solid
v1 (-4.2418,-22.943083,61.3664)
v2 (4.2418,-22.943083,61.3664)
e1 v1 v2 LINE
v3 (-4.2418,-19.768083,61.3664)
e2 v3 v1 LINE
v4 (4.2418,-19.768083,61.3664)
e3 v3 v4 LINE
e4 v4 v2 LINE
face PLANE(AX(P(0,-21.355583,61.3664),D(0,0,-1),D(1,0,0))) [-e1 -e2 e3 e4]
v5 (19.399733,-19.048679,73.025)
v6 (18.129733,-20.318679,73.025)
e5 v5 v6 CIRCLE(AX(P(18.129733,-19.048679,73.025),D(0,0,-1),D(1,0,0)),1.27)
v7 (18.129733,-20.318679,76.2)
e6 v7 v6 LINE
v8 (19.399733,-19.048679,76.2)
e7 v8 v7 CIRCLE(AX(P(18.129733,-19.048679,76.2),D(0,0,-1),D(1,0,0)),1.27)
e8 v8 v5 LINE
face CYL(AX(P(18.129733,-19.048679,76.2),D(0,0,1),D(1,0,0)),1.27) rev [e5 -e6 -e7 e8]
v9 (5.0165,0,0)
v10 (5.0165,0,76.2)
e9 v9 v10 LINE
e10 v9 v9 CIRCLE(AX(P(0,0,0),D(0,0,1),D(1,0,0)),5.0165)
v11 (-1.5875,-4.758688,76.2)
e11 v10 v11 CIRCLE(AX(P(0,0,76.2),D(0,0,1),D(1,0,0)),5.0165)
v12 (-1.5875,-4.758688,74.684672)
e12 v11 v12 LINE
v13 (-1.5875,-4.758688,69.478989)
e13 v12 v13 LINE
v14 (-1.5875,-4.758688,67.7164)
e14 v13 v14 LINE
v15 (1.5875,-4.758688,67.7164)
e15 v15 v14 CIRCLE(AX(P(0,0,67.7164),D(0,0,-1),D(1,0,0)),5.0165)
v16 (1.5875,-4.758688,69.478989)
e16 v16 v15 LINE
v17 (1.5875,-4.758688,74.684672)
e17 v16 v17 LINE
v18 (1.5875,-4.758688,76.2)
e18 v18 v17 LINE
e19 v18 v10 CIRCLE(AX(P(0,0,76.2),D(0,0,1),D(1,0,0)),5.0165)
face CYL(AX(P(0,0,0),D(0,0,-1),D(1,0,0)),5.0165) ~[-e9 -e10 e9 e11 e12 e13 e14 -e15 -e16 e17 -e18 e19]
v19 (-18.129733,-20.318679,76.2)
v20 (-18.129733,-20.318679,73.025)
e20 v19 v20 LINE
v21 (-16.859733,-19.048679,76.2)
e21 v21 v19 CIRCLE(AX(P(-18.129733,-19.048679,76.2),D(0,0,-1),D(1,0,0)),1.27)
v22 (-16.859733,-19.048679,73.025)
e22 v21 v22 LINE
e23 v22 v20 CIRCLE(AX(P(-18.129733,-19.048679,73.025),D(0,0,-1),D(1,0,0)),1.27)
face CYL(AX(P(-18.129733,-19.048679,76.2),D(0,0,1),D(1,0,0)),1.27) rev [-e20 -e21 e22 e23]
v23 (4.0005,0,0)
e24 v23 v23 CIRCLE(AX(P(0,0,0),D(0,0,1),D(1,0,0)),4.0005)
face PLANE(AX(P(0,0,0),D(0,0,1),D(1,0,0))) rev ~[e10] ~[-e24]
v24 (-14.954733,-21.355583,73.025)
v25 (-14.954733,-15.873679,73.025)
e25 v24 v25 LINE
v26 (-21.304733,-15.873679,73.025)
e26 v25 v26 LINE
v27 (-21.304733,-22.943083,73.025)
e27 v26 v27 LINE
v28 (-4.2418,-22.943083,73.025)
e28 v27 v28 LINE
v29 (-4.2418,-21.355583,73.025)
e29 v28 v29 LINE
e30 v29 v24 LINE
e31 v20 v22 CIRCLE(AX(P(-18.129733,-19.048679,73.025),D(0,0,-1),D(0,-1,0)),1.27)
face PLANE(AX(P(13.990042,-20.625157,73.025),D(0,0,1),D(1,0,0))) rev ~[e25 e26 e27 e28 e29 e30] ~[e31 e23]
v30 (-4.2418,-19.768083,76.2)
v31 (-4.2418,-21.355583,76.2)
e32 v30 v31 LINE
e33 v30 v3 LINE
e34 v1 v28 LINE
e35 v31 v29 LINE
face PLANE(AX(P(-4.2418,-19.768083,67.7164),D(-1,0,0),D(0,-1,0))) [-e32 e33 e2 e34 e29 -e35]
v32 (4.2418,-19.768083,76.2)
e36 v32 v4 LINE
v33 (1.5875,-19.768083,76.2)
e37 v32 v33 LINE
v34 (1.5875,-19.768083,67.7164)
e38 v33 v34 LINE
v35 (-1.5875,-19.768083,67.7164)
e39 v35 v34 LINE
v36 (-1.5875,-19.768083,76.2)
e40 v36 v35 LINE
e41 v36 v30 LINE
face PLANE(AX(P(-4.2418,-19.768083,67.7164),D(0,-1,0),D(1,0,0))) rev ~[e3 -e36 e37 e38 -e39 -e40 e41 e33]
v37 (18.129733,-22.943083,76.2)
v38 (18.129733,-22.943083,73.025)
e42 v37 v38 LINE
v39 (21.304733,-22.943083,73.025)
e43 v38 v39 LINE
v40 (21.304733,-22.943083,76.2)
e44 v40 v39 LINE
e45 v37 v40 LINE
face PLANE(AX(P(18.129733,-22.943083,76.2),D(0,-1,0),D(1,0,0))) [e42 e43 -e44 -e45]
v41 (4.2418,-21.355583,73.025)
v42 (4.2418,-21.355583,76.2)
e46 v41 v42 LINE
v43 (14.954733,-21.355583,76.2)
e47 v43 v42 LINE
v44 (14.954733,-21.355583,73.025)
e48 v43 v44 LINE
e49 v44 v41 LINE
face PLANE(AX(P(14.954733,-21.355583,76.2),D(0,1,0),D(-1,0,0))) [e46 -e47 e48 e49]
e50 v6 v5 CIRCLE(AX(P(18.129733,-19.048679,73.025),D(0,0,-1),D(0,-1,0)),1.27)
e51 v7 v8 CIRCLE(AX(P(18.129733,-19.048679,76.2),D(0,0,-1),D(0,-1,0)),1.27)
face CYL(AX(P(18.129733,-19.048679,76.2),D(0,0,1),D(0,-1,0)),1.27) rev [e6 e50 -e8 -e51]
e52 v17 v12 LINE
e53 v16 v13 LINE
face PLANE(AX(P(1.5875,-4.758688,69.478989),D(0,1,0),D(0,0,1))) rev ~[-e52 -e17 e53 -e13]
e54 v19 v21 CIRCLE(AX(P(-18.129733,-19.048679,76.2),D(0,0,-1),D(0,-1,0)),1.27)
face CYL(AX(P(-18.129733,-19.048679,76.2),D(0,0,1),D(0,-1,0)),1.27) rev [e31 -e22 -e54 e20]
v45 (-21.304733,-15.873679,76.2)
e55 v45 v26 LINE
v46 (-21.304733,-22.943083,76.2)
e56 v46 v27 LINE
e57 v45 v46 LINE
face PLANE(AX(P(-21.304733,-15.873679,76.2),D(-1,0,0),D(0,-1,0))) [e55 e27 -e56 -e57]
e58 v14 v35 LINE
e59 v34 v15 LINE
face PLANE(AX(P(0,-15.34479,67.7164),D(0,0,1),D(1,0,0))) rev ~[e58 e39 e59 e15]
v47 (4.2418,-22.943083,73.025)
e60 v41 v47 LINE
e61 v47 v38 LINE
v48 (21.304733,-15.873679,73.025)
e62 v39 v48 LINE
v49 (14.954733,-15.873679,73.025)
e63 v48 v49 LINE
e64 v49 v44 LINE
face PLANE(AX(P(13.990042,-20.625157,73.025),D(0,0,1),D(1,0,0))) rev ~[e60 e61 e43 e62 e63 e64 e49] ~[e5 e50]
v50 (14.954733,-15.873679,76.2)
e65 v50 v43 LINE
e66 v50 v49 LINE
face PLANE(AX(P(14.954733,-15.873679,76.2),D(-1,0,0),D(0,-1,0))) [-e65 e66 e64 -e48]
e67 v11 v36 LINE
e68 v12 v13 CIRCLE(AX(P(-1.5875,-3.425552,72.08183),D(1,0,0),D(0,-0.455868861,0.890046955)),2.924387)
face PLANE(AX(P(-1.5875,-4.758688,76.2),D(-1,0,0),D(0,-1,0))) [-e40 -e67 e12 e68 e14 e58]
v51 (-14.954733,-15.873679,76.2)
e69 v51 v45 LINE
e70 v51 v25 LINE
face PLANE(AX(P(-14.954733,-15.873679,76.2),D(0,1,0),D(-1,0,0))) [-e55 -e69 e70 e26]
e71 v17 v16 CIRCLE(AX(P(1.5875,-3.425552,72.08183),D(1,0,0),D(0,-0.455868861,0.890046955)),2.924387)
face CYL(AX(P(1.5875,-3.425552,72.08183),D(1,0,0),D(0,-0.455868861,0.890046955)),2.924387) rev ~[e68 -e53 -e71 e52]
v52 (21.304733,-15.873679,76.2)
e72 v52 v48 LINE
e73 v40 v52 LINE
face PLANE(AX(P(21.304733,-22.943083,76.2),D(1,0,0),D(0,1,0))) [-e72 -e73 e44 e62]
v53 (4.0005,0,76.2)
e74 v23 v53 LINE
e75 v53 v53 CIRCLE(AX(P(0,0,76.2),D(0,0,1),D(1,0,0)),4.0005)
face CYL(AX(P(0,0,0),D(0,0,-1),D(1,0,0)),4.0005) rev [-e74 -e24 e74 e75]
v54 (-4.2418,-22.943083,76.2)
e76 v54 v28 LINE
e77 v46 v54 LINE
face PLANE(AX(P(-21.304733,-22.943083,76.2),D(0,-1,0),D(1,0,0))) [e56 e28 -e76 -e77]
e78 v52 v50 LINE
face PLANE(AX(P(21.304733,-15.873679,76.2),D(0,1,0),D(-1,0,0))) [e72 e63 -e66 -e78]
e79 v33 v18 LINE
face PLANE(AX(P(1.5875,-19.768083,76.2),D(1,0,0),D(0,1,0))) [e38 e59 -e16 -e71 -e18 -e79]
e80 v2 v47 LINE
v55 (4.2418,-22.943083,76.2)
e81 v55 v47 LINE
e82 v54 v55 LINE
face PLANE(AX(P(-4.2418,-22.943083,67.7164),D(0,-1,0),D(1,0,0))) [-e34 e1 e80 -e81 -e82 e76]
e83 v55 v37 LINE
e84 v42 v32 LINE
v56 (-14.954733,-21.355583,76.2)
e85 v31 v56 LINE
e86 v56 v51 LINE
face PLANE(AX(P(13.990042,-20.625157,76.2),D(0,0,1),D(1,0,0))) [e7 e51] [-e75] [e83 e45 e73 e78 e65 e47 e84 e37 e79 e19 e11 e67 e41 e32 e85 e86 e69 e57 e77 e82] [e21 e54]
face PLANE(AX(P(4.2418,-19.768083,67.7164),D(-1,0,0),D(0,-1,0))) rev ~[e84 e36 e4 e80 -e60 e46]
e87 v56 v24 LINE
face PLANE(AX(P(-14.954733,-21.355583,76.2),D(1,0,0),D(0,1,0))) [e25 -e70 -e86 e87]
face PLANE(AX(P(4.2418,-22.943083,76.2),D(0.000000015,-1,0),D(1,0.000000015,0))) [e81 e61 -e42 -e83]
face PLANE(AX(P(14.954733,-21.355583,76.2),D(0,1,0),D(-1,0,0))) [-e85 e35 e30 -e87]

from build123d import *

# Parameters (mm, degrees)
F0_R     = 5.0165
F0_R_2   = 4.0005
F1_DEPTH = 76.2
F3_DEPTH = 8.4836
F5_DEPTH = 25.4
F7_DEPTH = 3.175
F8_W     = 8.4836
F8_H     = 3.175
F9_DEPTH = 6.35


# Not quite as in the source:
# - ends of sketch curves that miss each other by under 0.0002 mm in the source are joined


with BuildPart() as f1:
    # F0 (on Top) → F1 (new body)
    with BuildSketch(Plane.XY):
        Circle(F0_R)
        Circle(F0_R_2, mode=Mode.SUBTRACT)
    extrude(amount=F1_DEPTH)

    # F2 (on face) → F3 (join)
    with BuildSketch(Plane.XY.offset(76.2)):
        Polygon((-4.2418, -22.9430834), (0, -22.9430834), (4.2418, -22.9430834), (4.2418, -19.7680834), (1.5875, -19.7680834), (1.5875, -5.0165), (1.5875, -4.7586884748), (0, -4.7586884748), (-1.5875, -4.7586884748), (-1.5875, -19.7680834), (-4.2418, -19.7680834), align=None)
    extrude(amount=-F3_DEPTH)

    # F4 (on face) → F5 (cut)
    with BuildSketch(Plane.YZ.offset(1.5875)):
        with BuildLine():
            Line((-4.7586884748, 69.4789886475), (-4.7586884748, 74.6846720576))
            ThreePointArc((-4.7586884748, 74.6846720576), (-6.34993848, 72.0818303525), (-4.7586884748, 69.4789886475))
        make_face()
    extrude(amount=-F5_DEPTH, mode=Mode.SUBTRACT)

    # F6 (on face) → F7 (join)
    with BuildSketch(Plane.XY.offset(76.2)):
        Polygon((4.2418, -21.3555831969), (4.2418, -22.9430834), (18.1297326, -22.9430831969), (21.3047326, -22.9430831969), (21.3047326, -22.2236789969), (21.3047326, -15.8736789969), (14.9547326, -15.8736789969), (14.9547326, -21.3555831969), align=None)
        with BuildLine():
            ThreePointArc((18.1297326, -20.3186789969), (17.2317069879, -18.1506533848), (19.3997326, -19.0486789969))
            ThreePointArc((19.3997326, -19.0486789969), (19.0277582121, -19.946704609), (18.1297326, -20.3186789969))
        make_face(mode=Mode.SUBTRACT)
        Polygon((-4.2418, -22.9430831969), (0, -22.9430831969), (4.2418, -22.9430831969), (4.2418, -21.3555831969), (-4.2418, -21.3555831969), align=None)
        Polygon((-18.1297326, -22.9430831969), (-4.2418, -22.9430831969), (-4.2418, -21.3555831969), (-14.9547326, -21.3555831969), (-14.9547326, -15.8736789969), (-21.3047326, -15.8736789969), (-21.3047326, -22.2236789969), (-21.3047326, -22.9430831969), align=None)
        with BuildLine():
            ThreePointArc((-18.1297326, -20.3186789969), (-19.0277582121, -18.1506533848), (-16.8597326, -19.0486789969))
            ThreePointArc((-16.8597326, -19.0486789969), (-17.2317069879, -19.946704609), (-18.1297326, -20.3186789969))
        make_face(mode=Mode.SUBTRACT)
    extrude(amount=-F7_DEPTH)

    # F8 (on face) → F9 (join)
    with BuildSketch(Plane(origin=(0, 0, 67.7164), x_dir=(1, 0, 0), z_dir=(0, 0, -1))):
        with Locations((0, 21.3555834)):
            Rectangle(F8_W, F8_H)
    extrude(amount=F9_DEPTH)


solid = f1.part
